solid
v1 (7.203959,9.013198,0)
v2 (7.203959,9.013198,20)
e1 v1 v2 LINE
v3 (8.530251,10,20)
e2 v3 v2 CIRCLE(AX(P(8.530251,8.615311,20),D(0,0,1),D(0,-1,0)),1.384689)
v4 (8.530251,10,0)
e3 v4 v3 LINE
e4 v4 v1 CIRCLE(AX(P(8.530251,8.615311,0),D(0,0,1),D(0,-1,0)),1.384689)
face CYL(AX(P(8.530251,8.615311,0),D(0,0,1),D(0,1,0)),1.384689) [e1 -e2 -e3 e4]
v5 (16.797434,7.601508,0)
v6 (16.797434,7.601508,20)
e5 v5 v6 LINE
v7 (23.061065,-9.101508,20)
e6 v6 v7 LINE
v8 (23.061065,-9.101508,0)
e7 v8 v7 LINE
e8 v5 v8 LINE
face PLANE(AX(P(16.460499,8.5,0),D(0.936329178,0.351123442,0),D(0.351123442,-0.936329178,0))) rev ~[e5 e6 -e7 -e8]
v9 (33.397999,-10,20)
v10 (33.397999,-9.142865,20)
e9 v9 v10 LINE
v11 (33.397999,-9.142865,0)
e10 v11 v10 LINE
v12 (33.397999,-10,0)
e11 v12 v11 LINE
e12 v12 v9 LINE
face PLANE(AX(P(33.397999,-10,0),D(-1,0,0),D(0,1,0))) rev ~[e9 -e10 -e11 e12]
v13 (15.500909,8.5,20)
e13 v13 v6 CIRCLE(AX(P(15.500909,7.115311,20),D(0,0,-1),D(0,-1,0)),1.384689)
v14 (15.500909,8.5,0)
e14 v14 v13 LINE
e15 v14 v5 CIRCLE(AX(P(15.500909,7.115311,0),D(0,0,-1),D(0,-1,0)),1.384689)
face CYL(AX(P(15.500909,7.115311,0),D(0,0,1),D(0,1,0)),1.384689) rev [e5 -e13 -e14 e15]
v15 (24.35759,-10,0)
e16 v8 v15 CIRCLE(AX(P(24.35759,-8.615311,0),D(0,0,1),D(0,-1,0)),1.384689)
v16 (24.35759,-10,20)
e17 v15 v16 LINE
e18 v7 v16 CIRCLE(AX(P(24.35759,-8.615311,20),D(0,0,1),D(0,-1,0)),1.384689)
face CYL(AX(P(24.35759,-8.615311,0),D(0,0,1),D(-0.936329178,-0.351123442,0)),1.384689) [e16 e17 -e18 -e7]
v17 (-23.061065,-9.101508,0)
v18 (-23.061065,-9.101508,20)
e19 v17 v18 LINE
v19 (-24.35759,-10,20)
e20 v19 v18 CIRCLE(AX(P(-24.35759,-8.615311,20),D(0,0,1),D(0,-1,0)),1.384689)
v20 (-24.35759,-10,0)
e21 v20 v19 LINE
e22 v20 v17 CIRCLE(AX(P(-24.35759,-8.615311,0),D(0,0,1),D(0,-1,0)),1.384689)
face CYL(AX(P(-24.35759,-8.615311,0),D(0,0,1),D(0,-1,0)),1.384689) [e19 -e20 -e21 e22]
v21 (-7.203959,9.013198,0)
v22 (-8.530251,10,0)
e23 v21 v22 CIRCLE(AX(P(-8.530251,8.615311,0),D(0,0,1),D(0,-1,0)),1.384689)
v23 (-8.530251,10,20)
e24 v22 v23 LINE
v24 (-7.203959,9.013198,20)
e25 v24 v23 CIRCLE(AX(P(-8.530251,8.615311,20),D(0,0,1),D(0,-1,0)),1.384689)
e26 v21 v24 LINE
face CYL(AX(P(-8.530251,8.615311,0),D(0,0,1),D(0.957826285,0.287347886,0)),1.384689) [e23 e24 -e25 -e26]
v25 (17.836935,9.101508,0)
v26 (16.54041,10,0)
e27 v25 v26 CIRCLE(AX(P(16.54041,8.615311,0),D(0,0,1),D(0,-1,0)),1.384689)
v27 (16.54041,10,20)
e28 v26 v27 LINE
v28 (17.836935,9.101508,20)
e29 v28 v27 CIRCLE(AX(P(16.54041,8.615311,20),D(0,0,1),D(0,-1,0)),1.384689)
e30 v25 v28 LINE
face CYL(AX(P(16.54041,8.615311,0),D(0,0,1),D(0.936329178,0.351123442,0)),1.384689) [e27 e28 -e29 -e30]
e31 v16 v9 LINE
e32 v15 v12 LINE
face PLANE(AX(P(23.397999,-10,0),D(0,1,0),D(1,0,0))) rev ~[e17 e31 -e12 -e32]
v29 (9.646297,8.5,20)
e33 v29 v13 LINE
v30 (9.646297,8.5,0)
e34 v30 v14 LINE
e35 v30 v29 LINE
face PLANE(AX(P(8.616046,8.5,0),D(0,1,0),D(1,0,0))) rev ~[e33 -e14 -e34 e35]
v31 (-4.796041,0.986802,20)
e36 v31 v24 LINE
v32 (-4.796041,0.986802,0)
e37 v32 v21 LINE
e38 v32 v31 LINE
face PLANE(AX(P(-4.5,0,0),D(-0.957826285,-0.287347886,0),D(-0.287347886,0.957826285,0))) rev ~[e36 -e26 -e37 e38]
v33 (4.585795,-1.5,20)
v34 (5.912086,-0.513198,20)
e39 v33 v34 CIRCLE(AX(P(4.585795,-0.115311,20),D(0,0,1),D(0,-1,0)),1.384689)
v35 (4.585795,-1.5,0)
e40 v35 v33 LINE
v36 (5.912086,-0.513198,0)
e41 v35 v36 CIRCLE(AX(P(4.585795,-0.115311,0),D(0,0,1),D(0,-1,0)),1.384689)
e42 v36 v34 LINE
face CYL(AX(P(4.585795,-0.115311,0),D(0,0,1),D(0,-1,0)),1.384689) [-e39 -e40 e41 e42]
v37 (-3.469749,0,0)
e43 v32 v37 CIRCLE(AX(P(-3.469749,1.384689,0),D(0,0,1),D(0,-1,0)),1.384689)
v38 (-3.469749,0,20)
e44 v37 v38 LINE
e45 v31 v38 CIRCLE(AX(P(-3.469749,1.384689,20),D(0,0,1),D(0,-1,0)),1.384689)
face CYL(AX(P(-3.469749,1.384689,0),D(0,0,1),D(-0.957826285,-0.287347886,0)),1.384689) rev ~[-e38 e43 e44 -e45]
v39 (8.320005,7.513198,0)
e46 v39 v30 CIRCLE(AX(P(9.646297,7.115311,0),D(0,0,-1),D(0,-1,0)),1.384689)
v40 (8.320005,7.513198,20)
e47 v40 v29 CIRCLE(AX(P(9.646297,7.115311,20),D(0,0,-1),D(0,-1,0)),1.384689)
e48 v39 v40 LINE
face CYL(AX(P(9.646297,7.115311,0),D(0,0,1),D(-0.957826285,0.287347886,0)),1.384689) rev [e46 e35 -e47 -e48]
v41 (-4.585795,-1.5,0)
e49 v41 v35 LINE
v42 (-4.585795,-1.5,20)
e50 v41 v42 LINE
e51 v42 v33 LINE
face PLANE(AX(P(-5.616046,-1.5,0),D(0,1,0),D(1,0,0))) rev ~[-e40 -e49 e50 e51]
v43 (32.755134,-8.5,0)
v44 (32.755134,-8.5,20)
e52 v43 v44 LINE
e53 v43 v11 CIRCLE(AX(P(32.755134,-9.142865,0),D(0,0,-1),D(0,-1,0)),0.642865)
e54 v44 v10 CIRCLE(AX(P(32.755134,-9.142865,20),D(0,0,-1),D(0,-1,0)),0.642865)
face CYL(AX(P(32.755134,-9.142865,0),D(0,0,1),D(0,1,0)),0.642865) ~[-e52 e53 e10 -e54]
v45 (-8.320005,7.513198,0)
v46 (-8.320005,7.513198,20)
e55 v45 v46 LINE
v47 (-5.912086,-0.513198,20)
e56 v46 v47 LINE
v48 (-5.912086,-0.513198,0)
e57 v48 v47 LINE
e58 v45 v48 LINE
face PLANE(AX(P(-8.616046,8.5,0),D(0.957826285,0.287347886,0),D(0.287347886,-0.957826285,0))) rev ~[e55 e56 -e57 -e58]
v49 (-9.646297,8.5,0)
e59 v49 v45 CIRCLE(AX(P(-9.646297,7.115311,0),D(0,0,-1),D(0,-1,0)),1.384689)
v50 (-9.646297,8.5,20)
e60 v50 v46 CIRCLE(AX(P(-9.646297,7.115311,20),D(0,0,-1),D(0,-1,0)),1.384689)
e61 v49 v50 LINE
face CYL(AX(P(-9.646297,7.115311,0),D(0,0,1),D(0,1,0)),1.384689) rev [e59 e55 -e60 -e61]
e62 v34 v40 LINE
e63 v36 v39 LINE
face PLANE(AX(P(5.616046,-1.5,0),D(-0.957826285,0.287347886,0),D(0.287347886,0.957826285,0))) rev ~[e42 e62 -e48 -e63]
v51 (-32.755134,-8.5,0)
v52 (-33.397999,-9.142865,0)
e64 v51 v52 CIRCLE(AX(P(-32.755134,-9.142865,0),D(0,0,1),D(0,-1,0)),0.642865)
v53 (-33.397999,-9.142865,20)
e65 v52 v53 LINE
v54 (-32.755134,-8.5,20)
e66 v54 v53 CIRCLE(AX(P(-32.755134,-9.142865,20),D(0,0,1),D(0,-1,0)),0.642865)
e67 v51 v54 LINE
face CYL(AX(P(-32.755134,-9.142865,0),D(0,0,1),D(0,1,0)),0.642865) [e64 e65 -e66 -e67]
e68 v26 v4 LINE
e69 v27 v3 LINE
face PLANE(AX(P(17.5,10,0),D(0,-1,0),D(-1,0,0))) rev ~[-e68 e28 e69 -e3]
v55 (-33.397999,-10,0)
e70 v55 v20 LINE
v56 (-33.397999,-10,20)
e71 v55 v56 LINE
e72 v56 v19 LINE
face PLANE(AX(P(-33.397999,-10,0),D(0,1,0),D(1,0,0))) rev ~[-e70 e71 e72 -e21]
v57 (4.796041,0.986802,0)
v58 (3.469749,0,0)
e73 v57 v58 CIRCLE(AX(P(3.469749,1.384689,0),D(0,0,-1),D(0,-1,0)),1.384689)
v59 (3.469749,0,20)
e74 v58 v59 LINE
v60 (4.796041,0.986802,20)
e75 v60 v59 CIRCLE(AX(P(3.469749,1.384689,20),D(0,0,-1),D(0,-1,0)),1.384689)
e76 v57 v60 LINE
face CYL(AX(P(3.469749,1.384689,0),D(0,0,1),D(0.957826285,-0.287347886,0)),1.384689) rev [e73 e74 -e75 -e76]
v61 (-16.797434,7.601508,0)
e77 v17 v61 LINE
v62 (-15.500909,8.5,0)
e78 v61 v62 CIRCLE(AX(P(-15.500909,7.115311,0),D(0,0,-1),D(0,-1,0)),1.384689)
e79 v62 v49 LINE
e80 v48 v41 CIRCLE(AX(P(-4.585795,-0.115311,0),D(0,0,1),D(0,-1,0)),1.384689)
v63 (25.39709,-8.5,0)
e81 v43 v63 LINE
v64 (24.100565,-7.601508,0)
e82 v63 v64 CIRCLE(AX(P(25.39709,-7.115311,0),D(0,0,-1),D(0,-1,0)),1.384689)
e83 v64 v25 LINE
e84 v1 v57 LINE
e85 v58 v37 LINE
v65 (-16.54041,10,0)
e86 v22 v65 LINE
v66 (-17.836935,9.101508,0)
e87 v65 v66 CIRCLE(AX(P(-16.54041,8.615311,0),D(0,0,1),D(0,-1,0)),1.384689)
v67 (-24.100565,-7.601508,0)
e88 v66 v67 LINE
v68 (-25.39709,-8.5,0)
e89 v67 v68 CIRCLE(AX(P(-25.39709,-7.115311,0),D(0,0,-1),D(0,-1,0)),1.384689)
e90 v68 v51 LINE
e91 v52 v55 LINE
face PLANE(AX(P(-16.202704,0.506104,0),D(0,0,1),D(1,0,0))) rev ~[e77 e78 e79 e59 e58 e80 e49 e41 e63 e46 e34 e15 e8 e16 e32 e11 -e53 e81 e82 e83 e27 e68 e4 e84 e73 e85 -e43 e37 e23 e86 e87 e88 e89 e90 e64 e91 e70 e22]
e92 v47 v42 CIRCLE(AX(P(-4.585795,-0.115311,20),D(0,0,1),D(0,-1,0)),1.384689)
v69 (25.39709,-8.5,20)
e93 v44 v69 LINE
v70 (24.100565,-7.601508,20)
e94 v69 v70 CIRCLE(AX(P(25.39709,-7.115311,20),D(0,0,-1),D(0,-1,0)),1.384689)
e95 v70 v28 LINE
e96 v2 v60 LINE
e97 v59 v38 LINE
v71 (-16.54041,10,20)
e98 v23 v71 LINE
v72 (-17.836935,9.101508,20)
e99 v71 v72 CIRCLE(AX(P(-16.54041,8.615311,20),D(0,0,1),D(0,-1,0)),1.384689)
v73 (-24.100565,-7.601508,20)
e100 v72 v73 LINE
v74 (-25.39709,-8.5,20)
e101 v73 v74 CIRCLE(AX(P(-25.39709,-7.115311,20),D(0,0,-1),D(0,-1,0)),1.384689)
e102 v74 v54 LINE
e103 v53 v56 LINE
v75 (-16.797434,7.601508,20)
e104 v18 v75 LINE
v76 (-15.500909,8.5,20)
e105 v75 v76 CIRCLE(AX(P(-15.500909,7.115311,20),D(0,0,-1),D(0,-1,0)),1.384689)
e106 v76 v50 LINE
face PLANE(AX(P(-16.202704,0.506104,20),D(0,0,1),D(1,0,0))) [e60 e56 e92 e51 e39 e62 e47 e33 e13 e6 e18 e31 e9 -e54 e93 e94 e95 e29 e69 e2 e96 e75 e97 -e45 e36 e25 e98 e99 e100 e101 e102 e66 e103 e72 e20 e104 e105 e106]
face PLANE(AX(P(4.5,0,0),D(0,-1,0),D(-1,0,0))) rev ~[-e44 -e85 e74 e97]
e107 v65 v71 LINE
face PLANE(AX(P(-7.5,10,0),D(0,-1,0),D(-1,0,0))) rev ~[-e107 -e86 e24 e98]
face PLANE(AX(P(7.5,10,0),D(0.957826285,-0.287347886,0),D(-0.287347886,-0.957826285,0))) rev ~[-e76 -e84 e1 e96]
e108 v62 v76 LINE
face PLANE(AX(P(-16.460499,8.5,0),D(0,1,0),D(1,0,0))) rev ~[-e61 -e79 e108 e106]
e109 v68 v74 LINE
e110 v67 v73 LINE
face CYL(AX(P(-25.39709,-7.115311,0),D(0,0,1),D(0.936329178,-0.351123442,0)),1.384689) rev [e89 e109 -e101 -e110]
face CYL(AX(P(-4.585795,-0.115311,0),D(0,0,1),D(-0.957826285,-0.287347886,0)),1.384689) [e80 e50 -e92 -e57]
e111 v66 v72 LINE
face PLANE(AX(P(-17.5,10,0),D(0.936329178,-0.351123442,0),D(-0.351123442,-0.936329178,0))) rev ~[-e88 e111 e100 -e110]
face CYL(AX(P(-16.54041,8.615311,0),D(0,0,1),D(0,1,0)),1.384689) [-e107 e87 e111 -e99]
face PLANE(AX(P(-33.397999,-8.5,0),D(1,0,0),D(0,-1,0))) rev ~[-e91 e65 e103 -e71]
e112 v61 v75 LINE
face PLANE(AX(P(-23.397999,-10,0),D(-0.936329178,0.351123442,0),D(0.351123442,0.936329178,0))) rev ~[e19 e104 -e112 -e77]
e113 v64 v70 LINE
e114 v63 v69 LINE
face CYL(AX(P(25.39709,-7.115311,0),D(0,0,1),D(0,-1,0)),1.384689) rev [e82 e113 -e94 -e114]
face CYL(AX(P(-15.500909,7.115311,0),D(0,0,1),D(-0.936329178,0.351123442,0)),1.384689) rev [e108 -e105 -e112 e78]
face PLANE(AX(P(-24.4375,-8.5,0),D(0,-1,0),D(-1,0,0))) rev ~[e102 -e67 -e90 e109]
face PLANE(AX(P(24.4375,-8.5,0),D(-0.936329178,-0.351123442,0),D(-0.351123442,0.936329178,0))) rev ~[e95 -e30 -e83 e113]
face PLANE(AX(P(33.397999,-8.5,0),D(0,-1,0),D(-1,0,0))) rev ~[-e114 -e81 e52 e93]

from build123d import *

# Parameters (mm, degrees)
F1_DEPTH = 20
F2_R     = 1.3846892623
F3_R     = 0.6428654195


# Not quite as in the source:
# - a feature names something its author has since deleted; it is built from what else it names


with BuildPart() as f1:
    # F0 (on Top) → F1 (new body)
    with BuildSketch(Plane.XY):
        Polygon((0, -1.5), (0, 0), (-4.5, 0), (-7.5, 10), (-17.5, 10), (-24.4375, -8.5), (-33.3979992978, -8.5), (-33.3979992978, -10), (-25, -10), (-23.3979992978, -10), (-16.4604992978, 8.5), (-8.6160459763, 8.5), (-5.6160459763, -1.5), align=None)
        Polygon((4.5, 0), (0, 0), (0, -1.5), (5.6160459763, -1.5), (8.6160459763, 8.5), (16.4604992978, 8.5), (23.3979992978, -10), (33.3979992978, -10), (33.3979992978, -8.5), (24.4375, -8.5), (17.5, 10), (7.5, 10), align=None)
    extrude(amount=F1_DEPTH)

    # F2
    f2_edges = [f1.edges().sort_by_distance(p)[0] for p in [
        (-7.5, 10, 10),
        (-4.5, 0, 10),
        (-17.5, 10, 10),
        (-16.460499, 8.5, 10),
        (-8.616046, 8.5, 10),
        (-5.616046, -1.5, 10),
        (17.5, 10, 10),
        (7.5, 10, 10),
        (4.5, 0, 10),
        (24.4375, -8.5, 10),
        (-24.4375, -8.5, 10),
        (5.616046, -1.5, 10),
        (8.616046, 8.5, 10),
        (16.460499, 8.5, 10),
        (23.397999, -10, 10),
        (-23.397999, -10, 10),
    ]]
    fillet(f2_edges, radius=F2_R)

    # F3
    f3_edges = [f1.edges().sort_by_distance(p)[0] for p in [
        (-33.397999, -8.5, 10),
        (33.397999, -8.5, 10),
    ]]
    fillet(f3_edges, radius=F3_R)


solid = f1.part
